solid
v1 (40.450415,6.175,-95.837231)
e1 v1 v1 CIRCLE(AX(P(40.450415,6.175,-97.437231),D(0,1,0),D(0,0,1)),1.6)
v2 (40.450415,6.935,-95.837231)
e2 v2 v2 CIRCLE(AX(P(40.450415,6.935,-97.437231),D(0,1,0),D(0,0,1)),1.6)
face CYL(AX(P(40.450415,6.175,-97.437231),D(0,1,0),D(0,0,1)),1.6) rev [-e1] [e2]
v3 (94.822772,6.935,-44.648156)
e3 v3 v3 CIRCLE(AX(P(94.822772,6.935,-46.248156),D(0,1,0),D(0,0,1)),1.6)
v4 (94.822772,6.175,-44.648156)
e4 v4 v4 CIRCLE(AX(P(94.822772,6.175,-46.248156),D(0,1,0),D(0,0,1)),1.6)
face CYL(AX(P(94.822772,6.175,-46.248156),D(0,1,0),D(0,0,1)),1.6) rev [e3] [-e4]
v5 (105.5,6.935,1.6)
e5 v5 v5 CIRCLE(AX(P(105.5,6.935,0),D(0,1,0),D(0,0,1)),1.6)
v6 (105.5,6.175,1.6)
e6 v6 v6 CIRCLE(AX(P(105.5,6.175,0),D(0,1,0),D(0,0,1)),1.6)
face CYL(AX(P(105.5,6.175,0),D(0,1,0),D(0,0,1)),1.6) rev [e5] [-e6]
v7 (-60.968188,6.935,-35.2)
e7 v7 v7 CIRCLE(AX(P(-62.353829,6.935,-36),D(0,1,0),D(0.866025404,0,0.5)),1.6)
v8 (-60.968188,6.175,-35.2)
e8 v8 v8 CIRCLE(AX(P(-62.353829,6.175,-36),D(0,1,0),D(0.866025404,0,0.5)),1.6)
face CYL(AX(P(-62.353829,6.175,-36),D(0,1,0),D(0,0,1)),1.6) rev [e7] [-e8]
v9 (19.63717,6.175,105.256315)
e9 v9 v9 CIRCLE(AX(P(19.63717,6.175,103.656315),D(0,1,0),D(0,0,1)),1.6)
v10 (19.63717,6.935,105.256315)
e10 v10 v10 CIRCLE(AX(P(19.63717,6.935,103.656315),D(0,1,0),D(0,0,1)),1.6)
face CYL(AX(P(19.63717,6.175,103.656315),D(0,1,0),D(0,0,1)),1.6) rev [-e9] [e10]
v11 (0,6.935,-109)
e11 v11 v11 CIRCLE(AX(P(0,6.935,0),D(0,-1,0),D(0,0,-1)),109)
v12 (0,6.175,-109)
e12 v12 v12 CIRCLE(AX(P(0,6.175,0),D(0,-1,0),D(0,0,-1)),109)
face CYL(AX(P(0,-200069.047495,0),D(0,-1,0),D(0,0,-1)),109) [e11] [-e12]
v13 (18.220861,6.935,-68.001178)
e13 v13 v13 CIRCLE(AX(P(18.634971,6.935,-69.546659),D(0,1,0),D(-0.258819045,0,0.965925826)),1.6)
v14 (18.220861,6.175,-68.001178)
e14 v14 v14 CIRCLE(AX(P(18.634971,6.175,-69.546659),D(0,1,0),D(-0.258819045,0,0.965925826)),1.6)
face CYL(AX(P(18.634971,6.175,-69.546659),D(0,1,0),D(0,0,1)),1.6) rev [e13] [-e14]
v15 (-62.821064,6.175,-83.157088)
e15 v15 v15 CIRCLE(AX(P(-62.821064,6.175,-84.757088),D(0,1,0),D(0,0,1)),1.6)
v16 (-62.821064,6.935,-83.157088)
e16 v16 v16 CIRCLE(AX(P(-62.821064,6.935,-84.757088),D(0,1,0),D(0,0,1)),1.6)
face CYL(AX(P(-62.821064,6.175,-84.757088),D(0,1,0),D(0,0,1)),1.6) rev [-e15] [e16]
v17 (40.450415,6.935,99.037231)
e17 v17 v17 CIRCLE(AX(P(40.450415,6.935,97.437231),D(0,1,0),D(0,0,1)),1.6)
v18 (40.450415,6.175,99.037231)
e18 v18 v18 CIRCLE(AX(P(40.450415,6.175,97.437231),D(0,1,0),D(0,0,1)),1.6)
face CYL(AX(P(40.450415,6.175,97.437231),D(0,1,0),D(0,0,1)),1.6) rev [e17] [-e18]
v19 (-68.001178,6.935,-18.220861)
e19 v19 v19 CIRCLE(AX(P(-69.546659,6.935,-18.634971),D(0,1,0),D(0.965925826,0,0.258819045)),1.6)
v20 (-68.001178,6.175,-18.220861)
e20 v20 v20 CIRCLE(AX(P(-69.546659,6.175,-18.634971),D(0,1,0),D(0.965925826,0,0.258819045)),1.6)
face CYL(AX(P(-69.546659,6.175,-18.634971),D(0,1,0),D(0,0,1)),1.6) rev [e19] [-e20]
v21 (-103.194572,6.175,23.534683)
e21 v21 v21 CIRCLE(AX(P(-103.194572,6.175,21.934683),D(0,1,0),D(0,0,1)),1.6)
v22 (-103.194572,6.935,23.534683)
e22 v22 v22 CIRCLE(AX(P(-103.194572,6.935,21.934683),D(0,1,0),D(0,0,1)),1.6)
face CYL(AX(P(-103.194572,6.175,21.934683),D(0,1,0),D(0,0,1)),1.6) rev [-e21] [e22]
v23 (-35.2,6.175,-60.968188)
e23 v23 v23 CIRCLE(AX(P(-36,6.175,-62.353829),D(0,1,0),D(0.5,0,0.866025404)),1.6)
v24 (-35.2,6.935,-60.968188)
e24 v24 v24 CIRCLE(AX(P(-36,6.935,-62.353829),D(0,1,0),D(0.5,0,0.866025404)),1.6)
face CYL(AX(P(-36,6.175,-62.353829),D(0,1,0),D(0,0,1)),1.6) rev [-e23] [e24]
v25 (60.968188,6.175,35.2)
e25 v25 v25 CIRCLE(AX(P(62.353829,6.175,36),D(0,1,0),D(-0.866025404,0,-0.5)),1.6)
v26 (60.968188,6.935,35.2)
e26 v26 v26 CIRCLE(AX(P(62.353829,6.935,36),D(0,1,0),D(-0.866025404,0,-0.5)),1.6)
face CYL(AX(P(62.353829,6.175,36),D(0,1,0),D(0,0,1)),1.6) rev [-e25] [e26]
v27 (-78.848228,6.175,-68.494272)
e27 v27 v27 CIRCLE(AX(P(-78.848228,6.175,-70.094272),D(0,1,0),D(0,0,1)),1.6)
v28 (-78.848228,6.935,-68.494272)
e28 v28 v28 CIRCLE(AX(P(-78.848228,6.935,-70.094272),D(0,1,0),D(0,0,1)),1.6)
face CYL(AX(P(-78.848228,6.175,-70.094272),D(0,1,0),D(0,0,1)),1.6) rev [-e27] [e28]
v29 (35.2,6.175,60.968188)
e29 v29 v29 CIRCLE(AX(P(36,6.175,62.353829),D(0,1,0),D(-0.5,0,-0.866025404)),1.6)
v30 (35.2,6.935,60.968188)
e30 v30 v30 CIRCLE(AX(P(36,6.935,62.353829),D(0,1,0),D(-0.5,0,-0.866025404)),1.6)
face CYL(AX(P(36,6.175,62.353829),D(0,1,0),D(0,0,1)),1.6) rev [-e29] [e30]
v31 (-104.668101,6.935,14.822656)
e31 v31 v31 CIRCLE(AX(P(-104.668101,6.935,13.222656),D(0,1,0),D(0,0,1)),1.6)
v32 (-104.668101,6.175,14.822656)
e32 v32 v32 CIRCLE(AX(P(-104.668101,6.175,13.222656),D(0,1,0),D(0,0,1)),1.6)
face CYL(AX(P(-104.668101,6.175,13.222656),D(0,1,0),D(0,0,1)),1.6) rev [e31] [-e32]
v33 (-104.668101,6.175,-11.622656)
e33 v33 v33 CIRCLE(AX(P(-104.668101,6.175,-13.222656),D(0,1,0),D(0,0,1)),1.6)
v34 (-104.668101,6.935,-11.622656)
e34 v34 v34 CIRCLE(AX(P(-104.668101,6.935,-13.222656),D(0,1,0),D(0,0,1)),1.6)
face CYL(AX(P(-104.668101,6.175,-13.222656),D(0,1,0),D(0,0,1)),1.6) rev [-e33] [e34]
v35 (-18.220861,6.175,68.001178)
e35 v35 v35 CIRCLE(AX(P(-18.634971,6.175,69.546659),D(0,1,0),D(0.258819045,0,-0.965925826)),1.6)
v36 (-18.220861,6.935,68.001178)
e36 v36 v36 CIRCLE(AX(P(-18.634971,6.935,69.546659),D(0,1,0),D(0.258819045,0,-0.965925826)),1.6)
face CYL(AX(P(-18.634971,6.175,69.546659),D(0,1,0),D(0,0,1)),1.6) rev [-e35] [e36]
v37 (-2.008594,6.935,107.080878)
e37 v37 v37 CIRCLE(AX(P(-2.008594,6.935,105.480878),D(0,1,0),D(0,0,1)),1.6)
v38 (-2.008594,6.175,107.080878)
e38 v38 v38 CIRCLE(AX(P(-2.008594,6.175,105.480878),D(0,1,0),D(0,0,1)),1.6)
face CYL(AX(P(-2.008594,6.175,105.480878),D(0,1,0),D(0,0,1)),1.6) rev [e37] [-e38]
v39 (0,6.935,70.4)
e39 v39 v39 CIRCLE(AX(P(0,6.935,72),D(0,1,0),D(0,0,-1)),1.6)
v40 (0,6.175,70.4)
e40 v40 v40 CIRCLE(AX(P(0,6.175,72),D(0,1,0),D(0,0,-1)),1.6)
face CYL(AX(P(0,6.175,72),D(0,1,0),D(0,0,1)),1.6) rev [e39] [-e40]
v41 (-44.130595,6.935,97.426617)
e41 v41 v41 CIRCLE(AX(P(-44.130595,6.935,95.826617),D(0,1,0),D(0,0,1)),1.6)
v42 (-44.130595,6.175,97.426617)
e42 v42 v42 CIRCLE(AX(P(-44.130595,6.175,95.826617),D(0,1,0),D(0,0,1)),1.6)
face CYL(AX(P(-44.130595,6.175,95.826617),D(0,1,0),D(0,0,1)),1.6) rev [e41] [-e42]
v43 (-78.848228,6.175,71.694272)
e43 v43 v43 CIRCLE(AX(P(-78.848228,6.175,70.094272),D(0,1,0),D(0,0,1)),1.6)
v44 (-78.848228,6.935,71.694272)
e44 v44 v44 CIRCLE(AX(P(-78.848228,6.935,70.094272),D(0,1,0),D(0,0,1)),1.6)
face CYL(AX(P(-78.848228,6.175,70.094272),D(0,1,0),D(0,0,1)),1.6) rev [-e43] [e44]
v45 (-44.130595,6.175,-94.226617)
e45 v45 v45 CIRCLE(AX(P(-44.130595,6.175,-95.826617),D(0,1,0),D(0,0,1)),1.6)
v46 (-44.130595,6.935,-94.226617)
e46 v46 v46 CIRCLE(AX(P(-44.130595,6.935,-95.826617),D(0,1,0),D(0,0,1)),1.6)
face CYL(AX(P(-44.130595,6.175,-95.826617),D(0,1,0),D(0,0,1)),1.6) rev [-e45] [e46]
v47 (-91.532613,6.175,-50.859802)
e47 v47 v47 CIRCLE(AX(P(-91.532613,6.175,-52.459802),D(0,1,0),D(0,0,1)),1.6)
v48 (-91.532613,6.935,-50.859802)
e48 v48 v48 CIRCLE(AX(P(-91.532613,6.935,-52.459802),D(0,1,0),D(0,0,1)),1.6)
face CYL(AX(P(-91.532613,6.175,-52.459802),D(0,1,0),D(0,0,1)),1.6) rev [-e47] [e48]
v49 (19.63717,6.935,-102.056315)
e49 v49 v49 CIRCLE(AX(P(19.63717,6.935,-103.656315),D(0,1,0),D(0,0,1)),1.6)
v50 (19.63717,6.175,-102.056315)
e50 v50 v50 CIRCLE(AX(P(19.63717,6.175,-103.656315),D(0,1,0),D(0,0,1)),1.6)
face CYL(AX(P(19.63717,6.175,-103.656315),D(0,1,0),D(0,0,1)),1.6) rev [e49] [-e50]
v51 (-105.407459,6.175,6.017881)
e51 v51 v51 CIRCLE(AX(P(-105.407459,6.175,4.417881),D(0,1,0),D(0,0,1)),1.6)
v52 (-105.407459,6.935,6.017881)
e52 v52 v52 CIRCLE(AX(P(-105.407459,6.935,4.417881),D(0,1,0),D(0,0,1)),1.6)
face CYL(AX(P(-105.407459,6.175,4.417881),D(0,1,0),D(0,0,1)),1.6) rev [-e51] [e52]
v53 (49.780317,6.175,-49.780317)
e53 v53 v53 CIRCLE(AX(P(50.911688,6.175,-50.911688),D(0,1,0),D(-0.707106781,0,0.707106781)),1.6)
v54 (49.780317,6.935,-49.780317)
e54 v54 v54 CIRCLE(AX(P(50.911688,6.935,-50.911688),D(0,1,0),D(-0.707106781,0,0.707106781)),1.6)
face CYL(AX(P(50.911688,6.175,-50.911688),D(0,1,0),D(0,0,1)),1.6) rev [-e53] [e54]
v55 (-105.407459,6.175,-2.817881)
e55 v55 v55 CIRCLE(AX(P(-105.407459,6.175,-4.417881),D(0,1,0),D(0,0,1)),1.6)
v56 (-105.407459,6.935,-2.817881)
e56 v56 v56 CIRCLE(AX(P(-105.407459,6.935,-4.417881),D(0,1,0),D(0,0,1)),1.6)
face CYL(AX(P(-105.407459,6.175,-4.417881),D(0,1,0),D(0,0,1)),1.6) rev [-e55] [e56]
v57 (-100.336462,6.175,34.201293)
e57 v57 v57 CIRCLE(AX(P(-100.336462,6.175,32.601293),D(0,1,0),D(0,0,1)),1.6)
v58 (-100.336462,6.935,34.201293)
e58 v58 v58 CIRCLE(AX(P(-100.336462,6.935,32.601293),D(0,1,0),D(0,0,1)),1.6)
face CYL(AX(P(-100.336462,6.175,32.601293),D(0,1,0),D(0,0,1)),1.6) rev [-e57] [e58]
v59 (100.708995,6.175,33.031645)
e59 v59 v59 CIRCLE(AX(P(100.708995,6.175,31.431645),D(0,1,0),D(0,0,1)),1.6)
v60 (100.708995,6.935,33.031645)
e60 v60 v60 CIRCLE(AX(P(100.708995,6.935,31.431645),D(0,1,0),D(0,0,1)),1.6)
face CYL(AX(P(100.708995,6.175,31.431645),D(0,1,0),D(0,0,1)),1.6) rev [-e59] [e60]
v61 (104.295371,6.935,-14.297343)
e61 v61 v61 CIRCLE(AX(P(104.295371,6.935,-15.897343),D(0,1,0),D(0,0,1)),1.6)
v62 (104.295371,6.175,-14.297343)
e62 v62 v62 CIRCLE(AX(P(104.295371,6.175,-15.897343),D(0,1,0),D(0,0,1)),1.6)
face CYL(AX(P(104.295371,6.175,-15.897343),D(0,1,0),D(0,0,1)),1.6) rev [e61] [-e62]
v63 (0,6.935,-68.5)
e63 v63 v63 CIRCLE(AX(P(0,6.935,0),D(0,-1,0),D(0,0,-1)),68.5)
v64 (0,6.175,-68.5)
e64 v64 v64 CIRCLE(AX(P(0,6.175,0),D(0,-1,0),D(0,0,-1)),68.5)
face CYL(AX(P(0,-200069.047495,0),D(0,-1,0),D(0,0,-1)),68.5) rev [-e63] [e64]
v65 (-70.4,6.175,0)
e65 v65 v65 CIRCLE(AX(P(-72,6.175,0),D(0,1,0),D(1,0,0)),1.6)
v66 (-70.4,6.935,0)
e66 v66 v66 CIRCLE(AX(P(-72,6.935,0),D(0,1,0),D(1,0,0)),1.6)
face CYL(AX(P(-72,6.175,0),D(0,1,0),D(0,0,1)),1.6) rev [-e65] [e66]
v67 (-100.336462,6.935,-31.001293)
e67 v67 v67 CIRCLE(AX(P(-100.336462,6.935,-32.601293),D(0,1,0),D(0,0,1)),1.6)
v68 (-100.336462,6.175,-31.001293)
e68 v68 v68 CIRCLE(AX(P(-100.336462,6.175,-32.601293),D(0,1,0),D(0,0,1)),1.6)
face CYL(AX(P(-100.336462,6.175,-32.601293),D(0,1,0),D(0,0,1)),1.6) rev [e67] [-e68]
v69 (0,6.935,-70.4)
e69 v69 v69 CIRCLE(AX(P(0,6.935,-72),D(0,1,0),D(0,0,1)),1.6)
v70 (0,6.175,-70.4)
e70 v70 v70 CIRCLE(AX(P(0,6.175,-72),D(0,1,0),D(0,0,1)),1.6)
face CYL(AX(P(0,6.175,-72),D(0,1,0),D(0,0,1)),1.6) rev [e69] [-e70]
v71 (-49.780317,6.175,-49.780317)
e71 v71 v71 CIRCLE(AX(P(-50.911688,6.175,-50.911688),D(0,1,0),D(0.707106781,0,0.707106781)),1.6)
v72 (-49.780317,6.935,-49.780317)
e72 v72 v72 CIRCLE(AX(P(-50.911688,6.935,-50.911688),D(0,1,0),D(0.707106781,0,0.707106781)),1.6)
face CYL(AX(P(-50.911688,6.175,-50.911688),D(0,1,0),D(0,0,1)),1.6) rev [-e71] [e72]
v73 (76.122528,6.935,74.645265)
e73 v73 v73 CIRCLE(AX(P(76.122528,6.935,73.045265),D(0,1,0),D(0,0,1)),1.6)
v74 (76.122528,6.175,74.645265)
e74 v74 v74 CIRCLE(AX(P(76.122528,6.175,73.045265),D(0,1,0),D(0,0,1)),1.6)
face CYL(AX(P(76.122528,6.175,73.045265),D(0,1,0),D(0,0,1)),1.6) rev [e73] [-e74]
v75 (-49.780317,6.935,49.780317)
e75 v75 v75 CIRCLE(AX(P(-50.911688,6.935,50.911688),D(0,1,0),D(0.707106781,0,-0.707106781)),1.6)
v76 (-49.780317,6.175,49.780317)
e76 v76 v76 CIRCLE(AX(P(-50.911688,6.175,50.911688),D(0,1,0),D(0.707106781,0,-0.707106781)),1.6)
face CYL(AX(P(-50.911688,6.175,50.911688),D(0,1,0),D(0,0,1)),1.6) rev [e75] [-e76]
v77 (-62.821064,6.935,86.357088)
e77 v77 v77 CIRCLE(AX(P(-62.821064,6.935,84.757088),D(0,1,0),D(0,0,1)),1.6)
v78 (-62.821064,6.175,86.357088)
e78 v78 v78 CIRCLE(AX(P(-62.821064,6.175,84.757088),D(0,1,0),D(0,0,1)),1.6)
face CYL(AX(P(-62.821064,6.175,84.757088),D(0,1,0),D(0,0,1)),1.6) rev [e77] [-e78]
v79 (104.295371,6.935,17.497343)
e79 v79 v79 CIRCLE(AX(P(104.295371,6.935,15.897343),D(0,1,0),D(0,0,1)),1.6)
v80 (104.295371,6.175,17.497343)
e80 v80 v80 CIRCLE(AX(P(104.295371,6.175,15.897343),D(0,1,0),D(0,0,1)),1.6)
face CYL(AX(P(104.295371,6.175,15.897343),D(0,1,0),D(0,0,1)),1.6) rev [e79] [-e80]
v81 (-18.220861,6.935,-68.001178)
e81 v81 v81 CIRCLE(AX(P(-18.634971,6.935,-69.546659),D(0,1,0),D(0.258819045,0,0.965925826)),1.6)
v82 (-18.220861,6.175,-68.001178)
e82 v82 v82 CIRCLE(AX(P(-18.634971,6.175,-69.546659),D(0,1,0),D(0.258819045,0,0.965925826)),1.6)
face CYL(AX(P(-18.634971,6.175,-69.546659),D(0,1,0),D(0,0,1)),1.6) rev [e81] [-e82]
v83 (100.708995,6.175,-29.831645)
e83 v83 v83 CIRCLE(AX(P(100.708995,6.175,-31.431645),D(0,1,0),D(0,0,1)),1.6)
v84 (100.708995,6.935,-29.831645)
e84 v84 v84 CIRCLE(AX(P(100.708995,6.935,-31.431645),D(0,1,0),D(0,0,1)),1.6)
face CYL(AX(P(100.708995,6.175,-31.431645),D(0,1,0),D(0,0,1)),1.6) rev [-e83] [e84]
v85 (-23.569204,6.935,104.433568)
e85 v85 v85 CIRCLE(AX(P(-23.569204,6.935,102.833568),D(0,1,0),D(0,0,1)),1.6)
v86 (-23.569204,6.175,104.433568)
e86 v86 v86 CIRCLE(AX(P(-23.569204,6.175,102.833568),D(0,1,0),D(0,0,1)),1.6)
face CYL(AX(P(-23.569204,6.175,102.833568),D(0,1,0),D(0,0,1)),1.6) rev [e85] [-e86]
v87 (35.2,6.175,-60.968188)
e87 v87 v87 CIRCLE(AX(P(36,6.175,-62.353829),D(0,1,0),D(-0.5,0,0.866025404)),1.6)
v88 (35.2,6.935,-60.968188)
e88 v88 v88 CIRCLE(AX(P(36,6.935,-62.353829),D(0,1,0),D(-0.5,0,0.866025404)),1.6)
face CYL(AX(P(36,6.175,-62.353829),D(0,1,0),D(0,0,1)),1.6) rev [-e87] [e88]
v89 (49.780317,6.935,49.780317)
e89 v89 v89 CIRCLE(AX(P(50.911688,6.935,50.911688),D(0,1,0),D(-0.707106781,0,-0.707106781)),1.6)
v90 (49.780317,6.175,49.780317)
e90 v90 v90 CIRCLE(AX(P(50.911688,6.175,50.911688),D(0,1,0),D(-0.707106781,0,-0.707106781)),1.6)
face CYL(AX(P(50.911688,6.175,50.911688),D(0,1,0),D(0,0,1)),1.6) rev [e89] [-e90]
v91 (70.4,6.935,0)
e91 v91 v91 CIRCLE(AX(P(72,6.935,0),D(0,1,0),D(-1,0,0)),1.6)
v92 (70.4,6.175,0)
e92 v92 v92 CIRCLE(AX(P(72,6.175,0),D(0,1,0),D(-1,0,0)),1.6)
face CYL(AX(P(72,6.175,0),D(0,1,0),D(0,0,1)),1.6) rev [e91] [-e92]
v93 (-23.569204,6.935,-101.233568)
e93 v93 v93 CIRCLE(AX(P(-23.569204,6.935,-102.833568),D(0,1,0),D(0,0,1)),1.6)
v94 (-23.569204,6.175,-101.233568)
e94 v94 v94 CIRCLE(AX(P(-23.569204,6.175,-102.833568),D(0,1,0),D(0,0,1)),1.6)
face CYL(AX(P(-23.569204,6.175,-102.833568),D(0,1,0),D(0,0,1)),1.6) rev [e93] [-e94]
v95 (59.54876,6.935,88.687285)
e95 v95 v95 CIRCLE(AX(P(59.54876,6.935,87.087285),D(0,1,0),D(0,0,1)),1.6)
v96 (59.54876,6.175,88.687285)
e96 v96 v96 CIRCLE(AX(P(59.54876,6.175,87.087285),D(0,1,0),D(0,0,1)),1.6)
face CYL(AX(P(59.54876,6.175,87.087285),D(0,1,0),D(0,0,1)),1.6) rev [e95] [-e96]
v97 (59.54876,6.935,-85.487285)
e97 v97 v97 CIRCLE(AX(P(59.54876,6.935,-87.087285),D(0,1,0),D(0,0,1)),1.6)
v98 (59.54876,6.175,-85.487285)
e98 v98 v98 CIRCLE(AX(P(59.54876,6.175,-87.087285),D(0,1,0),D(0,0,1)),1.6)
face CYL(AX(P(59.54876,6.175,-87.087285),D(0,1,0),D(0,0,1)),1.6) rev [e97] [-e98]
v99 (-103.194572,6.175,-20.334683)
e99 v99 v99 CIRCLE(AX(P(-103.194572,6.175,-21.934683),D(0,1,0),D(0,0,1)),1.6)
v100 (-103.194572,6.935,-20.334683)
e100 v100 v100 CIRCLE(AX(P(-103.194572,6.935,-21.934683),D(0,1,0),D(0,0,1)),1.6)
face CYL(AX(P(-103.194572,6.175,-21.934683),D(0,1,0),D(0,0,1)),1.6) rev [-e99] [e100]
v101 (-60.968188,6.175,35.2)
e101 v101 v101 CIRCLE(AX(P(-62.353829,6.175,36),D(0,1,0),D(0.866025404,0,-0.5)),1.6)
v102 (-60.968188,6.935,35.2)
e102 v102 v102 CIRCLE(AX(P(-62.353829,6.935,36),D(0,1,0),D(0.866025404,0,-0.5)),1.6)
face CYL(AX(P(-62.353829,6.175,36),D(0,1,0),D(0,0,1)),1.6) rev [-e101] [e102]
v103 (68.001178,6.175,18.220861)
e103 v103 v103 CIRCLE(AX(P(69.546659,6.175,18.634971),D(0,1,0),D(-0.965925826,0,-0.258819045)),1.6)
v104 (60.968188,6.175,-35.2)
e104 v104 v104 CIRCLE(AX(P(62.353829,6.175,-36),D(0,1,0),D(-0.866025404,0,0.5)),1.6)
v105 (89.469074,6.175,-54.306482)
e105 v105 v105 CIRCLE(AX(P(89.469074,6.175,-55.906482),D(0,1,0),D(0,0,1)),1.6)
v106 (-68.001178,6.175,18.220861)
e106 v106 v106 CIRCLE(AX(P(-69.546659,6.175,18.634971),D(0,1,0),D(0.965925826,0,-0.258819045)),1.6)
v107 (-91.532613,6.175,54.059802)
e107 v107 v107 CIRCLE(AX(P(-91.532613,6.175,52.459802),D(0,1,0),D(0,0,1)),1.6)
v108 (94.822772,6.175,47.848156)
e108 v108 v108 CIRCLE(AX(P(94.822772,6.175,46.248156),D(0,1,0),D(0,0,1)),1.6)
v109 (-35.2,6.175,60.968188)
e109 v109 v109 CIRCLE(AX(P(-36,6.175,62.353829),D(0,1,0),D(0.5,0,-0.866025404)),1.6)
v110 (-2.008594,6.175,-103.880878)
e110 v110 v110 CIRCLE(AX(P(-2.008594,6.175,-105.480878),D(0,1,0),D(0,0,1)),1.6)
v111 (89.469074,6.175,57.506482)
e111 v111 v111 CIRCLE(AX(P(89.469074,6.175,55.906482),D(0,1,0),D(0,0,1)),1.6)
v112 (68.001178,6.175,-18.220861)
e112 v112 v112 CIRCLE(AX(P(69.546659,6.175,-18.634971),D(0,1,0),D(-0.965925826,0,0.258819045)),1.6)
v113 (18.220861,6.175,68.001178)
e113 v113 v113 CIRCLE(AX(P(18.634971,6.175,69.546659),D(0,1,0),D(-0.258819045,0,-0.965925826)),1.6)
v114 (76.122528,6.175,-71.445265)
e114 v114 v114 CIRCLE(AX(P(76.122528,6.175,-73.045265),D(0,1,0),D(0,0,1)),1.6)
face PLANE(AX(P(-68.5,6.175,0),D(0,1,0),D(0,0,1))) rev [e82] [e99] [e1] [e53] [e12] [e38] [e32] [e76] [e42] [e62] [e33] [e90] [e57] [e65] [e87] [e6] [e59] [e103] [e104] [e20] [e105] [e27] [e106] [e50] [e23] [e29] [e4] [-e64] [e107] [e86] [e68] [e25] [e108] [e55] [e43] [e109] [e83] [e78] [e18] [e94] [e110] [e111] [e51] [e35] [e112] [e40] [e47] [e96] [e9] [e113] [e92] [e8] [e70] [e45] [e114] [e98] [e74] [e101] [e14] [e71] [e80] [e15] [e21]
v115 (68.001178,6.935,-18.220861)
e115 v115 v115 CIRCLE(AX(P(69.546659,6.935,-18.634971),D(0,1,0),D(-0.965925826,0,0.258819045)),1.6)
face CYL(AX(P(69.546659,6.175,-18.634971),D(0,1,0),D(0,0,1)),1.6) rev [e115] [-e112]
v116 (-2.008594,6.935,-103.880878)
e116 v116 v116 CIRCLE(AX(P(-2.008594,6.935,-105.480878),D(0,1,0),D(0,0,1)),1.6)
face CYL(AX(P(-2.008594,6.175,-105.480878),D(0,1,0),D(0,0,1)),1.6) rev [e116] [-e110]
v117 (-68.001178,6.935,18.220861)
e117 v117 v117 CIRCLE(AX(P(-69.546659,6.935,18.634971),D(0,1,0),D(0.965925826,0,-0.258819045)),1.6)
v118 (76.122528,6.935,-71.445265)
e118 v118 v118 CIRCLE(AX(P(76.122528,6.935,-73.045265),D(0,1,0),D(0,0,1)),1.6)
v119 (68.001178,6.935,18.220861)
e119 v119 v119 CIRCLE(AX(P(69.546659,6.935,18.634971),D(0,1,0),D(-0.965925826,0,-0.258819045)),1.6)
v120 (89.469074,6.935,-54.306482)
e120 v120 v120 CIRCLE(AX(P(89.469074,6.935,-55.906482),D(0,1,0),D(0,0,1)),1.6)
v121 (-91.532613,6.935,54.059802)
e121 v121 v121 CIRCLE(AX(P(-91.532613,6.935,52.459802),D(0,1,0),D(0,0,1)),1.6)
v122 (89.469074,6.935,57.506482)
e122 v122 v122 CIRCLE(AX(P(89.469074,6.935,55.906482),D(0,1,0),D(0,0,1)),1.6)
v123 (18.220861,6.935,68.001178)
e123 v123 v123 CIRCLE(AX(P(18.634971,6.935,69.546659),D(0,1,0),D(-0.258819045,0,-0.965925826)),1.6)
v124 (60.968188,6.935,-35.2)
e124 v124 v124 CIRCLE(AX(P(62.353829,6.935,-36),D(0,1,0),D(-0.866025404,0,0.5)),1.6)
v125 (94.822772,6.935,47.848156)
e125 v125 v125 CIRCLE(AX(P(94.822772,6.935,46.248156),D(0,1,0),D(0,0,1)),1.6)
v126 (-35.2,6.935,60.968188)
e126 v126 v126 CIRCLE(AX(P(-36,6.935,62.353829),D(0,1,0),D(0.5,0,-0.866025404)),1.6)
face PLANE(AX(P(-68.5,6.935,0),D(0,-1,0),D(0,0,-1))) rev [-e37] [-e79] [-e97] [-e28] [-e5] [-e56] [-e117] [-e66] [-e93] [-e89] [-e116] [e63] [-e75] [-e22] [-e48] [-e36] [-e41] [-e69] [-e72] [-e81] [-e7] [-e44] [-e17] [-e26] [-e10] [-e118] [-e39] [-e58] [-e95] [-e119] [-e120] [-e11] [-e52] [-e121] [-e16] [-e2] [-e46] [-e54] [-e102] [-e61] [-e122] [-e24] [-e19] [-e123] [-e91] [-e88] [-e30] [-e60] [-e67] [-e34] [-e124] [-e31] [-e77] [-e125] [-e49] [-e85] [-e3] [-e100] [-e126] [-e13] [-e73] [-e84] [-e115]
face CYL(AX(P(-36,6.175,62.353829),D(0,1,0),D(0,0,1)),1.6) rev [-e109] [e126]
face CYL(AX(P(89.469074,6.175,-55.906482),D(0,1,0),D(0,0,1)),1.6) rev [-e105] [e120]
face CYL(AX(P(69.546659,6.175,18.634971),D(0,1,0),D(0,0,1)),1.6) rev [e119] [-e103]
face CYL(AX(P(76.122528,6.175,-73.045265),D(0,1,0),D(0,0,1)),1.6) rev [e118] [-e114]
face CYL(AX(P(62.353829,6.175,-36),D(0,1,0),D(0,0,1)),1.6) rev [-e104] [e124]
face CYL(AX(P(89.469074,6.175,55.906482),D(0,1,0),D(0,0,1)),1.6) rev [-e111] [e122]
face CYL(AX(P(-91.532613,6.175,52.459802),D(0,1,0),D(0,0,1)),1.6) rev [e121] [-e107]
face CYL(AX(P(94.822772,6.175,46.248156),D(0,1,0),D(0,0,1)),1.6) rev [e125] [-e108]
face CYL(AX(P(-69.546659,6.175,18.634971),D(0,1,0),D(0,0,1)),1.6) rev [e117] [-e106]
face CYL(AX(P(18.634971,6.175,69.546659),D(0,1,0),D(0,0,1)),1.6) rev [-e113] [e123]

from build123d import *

# Parameters (mm, degrees)
SKETCH1_W             = 40.5
SKETCH1_H             = 0.76
SKETCH2_R             = 1.6
CUT_EXTRUDE1_DEPTH    = 155.151151796
CIRPATTERN1_START     = 6.175
CIRPATTERN1_OUTLINE_R = 1.6
CIRPATTERN1_DEPTH     = 0.76
SKETCH4_R             = 1.6
CUT_EXTRUDE3_DEPTH    = 155.151151796


# Read off the part's stored shape, not the designer's step: CirPattern1
with BuildPart() as part:
    # Sketch1 → Revolve1 (revolve)
    with BuildSketch(Plane.XY, mode=Mode.PRIVATE) as revolve1_sk:
        with Locations((-88.75, 6.555)):
            Rectangle(SKETCH1_W, SKETCH1_H)
    revolve(revolve1_sk.sketch.rotate(Axis((0, -200069.047495165, 0), (0, 1, 0)), 270), axis=Axis((0, -200069.047495165, 0), (0, 1, 0)))

    # Sketch2 → Cut-Extrude1 (cut, through all)
    with BuildSketch(Plane(origin=(0, 6.935, 0), x_dir=(1, 0, 0), z_dir=(0, 1, 0))):
        with Locations(Location((0, 72, 0), (0, 0, 270))):
            Circle(SKETCH2_R)
    extrude(amount=-CUT_EXTRUDE1_DEPTH, mode=Mode.SUBTRACT)

    # CirPattern1 outline → CirPattern1 (cut)
    with BuildSketch(Plane(origin=(0, 0, 0), x_dir=(1, 0, 0), z_dir=(0, 1, 0)).offset(CIRPATTERN1_START)):
        with Locations((18.634971247, 69.546659493)):
            Circle(CIRPATTERN1_OUTLINE_R)
        with Locations((-18.634971247, 69.546659493)):
            Circle(CIRPATTERN1_OUTLINE_R)
        with Locations((-36, 62.353829072)):
            Circle(CIRPATTERN1_OUTLINE_R)
        with Locations((-50.911688245, 50.911688245)):
            Circle(CIRPATTERN1_OUTLINE_R)
        with Locations((-62.353829072, 36)):
            Circle(CIRPATTERN1_OUTLINE_R)
        with Locations((-69.546659493, 18.634971247)):
            Circle(CIRPATTERN1_OUTLINE_R)
        with Locations((-72, 0)):
            Circle(CIRPATTERN1_OUTLINE_R)
        with Locations((36, 62.353829072)):
            Circle(CIRPATTERN1_OUTLINE_R)
        with Locations((50.911688245, 50.911688245)):
            Circle(CIRPATTERN1_OUTLINE_R)
        with Locations((62.353829072, 36)):
            Circle(CIRPATTERN1_OUTLINE_R)
        with Locations((69.546659493, 18.634971247)):
            Circle(CIRPATTERN1_OUTLINE_R)
        with Locations((72, 0)):
            Circle(CIRPATTERN1_OUTLINE_R)
        with Locations((69.546659493, -18.634971247)):
            Circle(CIRPATTERN1_OUTLINE_R)
        with Locations((62.353829072, -36)):
            Circle(CIRPATTERN1_OUTLINE_R)
        with Locations((50.911688245, -50.911688245)):
            Circle(CIRPATTERN1_OUTLINE_R)
        with Locations((36, -62.353829072)):
            Circle(CIRPATTERN1_OUTLINE_R)
        with Locations((18.634971247, -69.546659493)):
            Circle(CIRPATTERN1_OUTLINE_R)
        with Locations((0, -72)):
            Circle(CIRPATTERN1_OUTLINE_R)
        with Locations((-18.634971247, -69.546659493)):
            Circle(CIRPATTERN1_OUTLINE_R)
        with Locations((-36, -62.353829072)):
            Circle(CIRPATTERN1_OUTLINE_R)
        with Locations((-50.911688245, -50.911688245)):
            Circle(CIRPATTERN1_OUTLINE_R)
        with Locations((-62.353829072, -36)):
            Circle(CIRPATTERN1_OUTLINE_R)
        with Locations((-69.546659493, -18.634971247)):
            Circle(CIRPATTERN1_OUTLINE_R)
    extrude(amount=CIRPATTERN1_DEPTH, mode=Mode.SUBTRACT)

    # Sketch4 → Cut-Extrude3 (cut, through all)
    with BuildSketch(Plane(origin=(0, 6.935, 0), x_dir=(1, 0, 0), z_dir=(0, 1, 0))):
        with Locations(Location((-103.194571877, -21.934683381, 0), (0, 0, 270))):
            Circle(SKETCH4_R)
        with Locations(Location((-105.407458575, -4.417881468, 0), (0, 0, 270))):
            Circle(SKETCH4_R)
        with Locations(Location((-104.668100989, -13.222656141, 0), (0, 0, 270))):
            Circle(SKETCH4_R)
        with Locations(Location((-100.336462469, 32.601292907, 0), (0, 0, 270))):
            Circle(SKETCH4_R)
        with Locations(Location((104.295371407, 15.897342642, 0), (0, 0, 270))):
            Circle(SKETCH4_R)
        with Locations(Location((100.708995202, 31.43164465, 0), (0, 0, 270))):
            Circle(SKETCH4_R)
        with Locations(Location((94.822771885, 46.248155986, 0), (0, 0, 270))):
            Circle(SKETCH4_R)
        with Locations(Location((-103.194571877, 21.934683381, 0), (0, 0, 270))):
            Circle(SKETCH4_R)
        with Locations(Location((-104.668100989, 13.222656141, 0), (0, 0, 270))):
            Circle(SKETCH4_R)
        with Locations(Location((-105.407458575, 4.417881468, 0), (0, 0, 270))):
            Circle(SKETCH4_R)
        with Locations(Location((89.469074145, -55.906482377, 0), (0, 0, 270))):
            Circle(SKETCH4_R)
        with Locations(Location((-44.130594647, 95.826617472, 0), (0, 0, 270))):
            Circle(SKETCH4_R)
        with Locations(Location((-62.82106423, 84.757087545, 0), (0, 0, 270))):
            Circle(SKETCH4_R)
        with Locations(Location((-78.848228037, 70.094271773, 0), (0, 0, 270))):
            Circle(SKETCH4_R)
        with Locations(Location((-91.532612735, 52.45980181, 0), (0, 0, 270))):
            Circle(SKETCH4_R)
        with Locations(Location((94.822771885, -46.248155986, 0), (0, 0, 270))):
            Circle(SKETCH4_R)
        with Locations(Location((100.708995202, -31.43164465, 0), (0, 0, 270))):
            Circle(SKETCH4_R)
        with Locations(Location((104.295371407, -15.897342642, 0), (0, 0, 270))):
            Circle(SKETCH4_R)
        with Locations(Location((105.5, 0, 0), (0, 0, 270))):
            Circle(SKETCH4_R)
        with Locations(Location((76.122528254, -73.04526468, 0), (0, 0, 270))):
            Circle(SKETCH4_R)
        with Locations(Location((89.469074145, 55.906482377, 0), (0, 0, 270))):
            Circle(SKETCH4_R)
        with Locations(Location((76.122528254, 73.04526468, 0), (0, 0, 270))):
            Circle(SKETCH4_R)
        with Locations(Location((59.54875959, 87.08728513, 0), (0, 0, 270))):
            Circle(SKETCH4_R)
        with Locations(Location((40.450414858, 97.437230758, 0), (0, 0, 270))):
            Circle(SKETCH4_R)
        with Locations(Location((19.637170436, 103.656314507, 0), (0, 0, 270))):
            Circle(SKETCH4_R)
        with Locations(Location((-2.008593938, 105.480877653, 0), (0, 0, 270))):
            Circle(SKETCH4_R)
        with Locations(Location((-23.569203757, 102.833567643, 0), (0, 0, 270))):
            Circle(SKETCH4_R)
        with Locations(Location((-91.532612735, -52.45980181, 0), (0, 0, 270))):
            Circle(SKETCH4_R)
        with Locations(Location((-62.82106423, -84.757087545, 0), (0, 0, 270))):
            Circle(SKETCH4_R)
        with Locations(Location((-44.130594647, -95.826617472, 0), (0, 0, 270))):
            Circle(SKETCH4_R)
        with Locations(Location((-23.569203757, -102.833567643, 0), (0, 0, 270))):
            Circle(SKETCH4_R)
        with Locations(Location((-2.008593938, -105.480877653, 0), (0, 0, 270))):
            Circle(SKETCH4_R)
        with Locations(Location((19.637170436, -103.656314507, 0), (0, 0, 270))):
            Circle(SKETCH4_R)
        with Locations(Location((40.450414858, -97.437230758, 0), (0, 0, 270))):
            Circle(SKETCH4_R)
        with Locations(Location((59.54875959, -87.08728513, 0), (0, 0, 270))):
            Circle(SKETCH4_R)
        with Locations(Location((-78.848228037, -70.094271773, 0), (0, 0, 270))):
            Circle(SKETCH4_R)
        with Locations(Location((-100.336462469, -32.601292907, 0), (0, 0, 270))):
            Circle(SKETCH4_R)
    extrude(amount=-CUT_EXTRUDE3_DEPTH, mode=Mode.SUBTRACT)


solid = part.part
